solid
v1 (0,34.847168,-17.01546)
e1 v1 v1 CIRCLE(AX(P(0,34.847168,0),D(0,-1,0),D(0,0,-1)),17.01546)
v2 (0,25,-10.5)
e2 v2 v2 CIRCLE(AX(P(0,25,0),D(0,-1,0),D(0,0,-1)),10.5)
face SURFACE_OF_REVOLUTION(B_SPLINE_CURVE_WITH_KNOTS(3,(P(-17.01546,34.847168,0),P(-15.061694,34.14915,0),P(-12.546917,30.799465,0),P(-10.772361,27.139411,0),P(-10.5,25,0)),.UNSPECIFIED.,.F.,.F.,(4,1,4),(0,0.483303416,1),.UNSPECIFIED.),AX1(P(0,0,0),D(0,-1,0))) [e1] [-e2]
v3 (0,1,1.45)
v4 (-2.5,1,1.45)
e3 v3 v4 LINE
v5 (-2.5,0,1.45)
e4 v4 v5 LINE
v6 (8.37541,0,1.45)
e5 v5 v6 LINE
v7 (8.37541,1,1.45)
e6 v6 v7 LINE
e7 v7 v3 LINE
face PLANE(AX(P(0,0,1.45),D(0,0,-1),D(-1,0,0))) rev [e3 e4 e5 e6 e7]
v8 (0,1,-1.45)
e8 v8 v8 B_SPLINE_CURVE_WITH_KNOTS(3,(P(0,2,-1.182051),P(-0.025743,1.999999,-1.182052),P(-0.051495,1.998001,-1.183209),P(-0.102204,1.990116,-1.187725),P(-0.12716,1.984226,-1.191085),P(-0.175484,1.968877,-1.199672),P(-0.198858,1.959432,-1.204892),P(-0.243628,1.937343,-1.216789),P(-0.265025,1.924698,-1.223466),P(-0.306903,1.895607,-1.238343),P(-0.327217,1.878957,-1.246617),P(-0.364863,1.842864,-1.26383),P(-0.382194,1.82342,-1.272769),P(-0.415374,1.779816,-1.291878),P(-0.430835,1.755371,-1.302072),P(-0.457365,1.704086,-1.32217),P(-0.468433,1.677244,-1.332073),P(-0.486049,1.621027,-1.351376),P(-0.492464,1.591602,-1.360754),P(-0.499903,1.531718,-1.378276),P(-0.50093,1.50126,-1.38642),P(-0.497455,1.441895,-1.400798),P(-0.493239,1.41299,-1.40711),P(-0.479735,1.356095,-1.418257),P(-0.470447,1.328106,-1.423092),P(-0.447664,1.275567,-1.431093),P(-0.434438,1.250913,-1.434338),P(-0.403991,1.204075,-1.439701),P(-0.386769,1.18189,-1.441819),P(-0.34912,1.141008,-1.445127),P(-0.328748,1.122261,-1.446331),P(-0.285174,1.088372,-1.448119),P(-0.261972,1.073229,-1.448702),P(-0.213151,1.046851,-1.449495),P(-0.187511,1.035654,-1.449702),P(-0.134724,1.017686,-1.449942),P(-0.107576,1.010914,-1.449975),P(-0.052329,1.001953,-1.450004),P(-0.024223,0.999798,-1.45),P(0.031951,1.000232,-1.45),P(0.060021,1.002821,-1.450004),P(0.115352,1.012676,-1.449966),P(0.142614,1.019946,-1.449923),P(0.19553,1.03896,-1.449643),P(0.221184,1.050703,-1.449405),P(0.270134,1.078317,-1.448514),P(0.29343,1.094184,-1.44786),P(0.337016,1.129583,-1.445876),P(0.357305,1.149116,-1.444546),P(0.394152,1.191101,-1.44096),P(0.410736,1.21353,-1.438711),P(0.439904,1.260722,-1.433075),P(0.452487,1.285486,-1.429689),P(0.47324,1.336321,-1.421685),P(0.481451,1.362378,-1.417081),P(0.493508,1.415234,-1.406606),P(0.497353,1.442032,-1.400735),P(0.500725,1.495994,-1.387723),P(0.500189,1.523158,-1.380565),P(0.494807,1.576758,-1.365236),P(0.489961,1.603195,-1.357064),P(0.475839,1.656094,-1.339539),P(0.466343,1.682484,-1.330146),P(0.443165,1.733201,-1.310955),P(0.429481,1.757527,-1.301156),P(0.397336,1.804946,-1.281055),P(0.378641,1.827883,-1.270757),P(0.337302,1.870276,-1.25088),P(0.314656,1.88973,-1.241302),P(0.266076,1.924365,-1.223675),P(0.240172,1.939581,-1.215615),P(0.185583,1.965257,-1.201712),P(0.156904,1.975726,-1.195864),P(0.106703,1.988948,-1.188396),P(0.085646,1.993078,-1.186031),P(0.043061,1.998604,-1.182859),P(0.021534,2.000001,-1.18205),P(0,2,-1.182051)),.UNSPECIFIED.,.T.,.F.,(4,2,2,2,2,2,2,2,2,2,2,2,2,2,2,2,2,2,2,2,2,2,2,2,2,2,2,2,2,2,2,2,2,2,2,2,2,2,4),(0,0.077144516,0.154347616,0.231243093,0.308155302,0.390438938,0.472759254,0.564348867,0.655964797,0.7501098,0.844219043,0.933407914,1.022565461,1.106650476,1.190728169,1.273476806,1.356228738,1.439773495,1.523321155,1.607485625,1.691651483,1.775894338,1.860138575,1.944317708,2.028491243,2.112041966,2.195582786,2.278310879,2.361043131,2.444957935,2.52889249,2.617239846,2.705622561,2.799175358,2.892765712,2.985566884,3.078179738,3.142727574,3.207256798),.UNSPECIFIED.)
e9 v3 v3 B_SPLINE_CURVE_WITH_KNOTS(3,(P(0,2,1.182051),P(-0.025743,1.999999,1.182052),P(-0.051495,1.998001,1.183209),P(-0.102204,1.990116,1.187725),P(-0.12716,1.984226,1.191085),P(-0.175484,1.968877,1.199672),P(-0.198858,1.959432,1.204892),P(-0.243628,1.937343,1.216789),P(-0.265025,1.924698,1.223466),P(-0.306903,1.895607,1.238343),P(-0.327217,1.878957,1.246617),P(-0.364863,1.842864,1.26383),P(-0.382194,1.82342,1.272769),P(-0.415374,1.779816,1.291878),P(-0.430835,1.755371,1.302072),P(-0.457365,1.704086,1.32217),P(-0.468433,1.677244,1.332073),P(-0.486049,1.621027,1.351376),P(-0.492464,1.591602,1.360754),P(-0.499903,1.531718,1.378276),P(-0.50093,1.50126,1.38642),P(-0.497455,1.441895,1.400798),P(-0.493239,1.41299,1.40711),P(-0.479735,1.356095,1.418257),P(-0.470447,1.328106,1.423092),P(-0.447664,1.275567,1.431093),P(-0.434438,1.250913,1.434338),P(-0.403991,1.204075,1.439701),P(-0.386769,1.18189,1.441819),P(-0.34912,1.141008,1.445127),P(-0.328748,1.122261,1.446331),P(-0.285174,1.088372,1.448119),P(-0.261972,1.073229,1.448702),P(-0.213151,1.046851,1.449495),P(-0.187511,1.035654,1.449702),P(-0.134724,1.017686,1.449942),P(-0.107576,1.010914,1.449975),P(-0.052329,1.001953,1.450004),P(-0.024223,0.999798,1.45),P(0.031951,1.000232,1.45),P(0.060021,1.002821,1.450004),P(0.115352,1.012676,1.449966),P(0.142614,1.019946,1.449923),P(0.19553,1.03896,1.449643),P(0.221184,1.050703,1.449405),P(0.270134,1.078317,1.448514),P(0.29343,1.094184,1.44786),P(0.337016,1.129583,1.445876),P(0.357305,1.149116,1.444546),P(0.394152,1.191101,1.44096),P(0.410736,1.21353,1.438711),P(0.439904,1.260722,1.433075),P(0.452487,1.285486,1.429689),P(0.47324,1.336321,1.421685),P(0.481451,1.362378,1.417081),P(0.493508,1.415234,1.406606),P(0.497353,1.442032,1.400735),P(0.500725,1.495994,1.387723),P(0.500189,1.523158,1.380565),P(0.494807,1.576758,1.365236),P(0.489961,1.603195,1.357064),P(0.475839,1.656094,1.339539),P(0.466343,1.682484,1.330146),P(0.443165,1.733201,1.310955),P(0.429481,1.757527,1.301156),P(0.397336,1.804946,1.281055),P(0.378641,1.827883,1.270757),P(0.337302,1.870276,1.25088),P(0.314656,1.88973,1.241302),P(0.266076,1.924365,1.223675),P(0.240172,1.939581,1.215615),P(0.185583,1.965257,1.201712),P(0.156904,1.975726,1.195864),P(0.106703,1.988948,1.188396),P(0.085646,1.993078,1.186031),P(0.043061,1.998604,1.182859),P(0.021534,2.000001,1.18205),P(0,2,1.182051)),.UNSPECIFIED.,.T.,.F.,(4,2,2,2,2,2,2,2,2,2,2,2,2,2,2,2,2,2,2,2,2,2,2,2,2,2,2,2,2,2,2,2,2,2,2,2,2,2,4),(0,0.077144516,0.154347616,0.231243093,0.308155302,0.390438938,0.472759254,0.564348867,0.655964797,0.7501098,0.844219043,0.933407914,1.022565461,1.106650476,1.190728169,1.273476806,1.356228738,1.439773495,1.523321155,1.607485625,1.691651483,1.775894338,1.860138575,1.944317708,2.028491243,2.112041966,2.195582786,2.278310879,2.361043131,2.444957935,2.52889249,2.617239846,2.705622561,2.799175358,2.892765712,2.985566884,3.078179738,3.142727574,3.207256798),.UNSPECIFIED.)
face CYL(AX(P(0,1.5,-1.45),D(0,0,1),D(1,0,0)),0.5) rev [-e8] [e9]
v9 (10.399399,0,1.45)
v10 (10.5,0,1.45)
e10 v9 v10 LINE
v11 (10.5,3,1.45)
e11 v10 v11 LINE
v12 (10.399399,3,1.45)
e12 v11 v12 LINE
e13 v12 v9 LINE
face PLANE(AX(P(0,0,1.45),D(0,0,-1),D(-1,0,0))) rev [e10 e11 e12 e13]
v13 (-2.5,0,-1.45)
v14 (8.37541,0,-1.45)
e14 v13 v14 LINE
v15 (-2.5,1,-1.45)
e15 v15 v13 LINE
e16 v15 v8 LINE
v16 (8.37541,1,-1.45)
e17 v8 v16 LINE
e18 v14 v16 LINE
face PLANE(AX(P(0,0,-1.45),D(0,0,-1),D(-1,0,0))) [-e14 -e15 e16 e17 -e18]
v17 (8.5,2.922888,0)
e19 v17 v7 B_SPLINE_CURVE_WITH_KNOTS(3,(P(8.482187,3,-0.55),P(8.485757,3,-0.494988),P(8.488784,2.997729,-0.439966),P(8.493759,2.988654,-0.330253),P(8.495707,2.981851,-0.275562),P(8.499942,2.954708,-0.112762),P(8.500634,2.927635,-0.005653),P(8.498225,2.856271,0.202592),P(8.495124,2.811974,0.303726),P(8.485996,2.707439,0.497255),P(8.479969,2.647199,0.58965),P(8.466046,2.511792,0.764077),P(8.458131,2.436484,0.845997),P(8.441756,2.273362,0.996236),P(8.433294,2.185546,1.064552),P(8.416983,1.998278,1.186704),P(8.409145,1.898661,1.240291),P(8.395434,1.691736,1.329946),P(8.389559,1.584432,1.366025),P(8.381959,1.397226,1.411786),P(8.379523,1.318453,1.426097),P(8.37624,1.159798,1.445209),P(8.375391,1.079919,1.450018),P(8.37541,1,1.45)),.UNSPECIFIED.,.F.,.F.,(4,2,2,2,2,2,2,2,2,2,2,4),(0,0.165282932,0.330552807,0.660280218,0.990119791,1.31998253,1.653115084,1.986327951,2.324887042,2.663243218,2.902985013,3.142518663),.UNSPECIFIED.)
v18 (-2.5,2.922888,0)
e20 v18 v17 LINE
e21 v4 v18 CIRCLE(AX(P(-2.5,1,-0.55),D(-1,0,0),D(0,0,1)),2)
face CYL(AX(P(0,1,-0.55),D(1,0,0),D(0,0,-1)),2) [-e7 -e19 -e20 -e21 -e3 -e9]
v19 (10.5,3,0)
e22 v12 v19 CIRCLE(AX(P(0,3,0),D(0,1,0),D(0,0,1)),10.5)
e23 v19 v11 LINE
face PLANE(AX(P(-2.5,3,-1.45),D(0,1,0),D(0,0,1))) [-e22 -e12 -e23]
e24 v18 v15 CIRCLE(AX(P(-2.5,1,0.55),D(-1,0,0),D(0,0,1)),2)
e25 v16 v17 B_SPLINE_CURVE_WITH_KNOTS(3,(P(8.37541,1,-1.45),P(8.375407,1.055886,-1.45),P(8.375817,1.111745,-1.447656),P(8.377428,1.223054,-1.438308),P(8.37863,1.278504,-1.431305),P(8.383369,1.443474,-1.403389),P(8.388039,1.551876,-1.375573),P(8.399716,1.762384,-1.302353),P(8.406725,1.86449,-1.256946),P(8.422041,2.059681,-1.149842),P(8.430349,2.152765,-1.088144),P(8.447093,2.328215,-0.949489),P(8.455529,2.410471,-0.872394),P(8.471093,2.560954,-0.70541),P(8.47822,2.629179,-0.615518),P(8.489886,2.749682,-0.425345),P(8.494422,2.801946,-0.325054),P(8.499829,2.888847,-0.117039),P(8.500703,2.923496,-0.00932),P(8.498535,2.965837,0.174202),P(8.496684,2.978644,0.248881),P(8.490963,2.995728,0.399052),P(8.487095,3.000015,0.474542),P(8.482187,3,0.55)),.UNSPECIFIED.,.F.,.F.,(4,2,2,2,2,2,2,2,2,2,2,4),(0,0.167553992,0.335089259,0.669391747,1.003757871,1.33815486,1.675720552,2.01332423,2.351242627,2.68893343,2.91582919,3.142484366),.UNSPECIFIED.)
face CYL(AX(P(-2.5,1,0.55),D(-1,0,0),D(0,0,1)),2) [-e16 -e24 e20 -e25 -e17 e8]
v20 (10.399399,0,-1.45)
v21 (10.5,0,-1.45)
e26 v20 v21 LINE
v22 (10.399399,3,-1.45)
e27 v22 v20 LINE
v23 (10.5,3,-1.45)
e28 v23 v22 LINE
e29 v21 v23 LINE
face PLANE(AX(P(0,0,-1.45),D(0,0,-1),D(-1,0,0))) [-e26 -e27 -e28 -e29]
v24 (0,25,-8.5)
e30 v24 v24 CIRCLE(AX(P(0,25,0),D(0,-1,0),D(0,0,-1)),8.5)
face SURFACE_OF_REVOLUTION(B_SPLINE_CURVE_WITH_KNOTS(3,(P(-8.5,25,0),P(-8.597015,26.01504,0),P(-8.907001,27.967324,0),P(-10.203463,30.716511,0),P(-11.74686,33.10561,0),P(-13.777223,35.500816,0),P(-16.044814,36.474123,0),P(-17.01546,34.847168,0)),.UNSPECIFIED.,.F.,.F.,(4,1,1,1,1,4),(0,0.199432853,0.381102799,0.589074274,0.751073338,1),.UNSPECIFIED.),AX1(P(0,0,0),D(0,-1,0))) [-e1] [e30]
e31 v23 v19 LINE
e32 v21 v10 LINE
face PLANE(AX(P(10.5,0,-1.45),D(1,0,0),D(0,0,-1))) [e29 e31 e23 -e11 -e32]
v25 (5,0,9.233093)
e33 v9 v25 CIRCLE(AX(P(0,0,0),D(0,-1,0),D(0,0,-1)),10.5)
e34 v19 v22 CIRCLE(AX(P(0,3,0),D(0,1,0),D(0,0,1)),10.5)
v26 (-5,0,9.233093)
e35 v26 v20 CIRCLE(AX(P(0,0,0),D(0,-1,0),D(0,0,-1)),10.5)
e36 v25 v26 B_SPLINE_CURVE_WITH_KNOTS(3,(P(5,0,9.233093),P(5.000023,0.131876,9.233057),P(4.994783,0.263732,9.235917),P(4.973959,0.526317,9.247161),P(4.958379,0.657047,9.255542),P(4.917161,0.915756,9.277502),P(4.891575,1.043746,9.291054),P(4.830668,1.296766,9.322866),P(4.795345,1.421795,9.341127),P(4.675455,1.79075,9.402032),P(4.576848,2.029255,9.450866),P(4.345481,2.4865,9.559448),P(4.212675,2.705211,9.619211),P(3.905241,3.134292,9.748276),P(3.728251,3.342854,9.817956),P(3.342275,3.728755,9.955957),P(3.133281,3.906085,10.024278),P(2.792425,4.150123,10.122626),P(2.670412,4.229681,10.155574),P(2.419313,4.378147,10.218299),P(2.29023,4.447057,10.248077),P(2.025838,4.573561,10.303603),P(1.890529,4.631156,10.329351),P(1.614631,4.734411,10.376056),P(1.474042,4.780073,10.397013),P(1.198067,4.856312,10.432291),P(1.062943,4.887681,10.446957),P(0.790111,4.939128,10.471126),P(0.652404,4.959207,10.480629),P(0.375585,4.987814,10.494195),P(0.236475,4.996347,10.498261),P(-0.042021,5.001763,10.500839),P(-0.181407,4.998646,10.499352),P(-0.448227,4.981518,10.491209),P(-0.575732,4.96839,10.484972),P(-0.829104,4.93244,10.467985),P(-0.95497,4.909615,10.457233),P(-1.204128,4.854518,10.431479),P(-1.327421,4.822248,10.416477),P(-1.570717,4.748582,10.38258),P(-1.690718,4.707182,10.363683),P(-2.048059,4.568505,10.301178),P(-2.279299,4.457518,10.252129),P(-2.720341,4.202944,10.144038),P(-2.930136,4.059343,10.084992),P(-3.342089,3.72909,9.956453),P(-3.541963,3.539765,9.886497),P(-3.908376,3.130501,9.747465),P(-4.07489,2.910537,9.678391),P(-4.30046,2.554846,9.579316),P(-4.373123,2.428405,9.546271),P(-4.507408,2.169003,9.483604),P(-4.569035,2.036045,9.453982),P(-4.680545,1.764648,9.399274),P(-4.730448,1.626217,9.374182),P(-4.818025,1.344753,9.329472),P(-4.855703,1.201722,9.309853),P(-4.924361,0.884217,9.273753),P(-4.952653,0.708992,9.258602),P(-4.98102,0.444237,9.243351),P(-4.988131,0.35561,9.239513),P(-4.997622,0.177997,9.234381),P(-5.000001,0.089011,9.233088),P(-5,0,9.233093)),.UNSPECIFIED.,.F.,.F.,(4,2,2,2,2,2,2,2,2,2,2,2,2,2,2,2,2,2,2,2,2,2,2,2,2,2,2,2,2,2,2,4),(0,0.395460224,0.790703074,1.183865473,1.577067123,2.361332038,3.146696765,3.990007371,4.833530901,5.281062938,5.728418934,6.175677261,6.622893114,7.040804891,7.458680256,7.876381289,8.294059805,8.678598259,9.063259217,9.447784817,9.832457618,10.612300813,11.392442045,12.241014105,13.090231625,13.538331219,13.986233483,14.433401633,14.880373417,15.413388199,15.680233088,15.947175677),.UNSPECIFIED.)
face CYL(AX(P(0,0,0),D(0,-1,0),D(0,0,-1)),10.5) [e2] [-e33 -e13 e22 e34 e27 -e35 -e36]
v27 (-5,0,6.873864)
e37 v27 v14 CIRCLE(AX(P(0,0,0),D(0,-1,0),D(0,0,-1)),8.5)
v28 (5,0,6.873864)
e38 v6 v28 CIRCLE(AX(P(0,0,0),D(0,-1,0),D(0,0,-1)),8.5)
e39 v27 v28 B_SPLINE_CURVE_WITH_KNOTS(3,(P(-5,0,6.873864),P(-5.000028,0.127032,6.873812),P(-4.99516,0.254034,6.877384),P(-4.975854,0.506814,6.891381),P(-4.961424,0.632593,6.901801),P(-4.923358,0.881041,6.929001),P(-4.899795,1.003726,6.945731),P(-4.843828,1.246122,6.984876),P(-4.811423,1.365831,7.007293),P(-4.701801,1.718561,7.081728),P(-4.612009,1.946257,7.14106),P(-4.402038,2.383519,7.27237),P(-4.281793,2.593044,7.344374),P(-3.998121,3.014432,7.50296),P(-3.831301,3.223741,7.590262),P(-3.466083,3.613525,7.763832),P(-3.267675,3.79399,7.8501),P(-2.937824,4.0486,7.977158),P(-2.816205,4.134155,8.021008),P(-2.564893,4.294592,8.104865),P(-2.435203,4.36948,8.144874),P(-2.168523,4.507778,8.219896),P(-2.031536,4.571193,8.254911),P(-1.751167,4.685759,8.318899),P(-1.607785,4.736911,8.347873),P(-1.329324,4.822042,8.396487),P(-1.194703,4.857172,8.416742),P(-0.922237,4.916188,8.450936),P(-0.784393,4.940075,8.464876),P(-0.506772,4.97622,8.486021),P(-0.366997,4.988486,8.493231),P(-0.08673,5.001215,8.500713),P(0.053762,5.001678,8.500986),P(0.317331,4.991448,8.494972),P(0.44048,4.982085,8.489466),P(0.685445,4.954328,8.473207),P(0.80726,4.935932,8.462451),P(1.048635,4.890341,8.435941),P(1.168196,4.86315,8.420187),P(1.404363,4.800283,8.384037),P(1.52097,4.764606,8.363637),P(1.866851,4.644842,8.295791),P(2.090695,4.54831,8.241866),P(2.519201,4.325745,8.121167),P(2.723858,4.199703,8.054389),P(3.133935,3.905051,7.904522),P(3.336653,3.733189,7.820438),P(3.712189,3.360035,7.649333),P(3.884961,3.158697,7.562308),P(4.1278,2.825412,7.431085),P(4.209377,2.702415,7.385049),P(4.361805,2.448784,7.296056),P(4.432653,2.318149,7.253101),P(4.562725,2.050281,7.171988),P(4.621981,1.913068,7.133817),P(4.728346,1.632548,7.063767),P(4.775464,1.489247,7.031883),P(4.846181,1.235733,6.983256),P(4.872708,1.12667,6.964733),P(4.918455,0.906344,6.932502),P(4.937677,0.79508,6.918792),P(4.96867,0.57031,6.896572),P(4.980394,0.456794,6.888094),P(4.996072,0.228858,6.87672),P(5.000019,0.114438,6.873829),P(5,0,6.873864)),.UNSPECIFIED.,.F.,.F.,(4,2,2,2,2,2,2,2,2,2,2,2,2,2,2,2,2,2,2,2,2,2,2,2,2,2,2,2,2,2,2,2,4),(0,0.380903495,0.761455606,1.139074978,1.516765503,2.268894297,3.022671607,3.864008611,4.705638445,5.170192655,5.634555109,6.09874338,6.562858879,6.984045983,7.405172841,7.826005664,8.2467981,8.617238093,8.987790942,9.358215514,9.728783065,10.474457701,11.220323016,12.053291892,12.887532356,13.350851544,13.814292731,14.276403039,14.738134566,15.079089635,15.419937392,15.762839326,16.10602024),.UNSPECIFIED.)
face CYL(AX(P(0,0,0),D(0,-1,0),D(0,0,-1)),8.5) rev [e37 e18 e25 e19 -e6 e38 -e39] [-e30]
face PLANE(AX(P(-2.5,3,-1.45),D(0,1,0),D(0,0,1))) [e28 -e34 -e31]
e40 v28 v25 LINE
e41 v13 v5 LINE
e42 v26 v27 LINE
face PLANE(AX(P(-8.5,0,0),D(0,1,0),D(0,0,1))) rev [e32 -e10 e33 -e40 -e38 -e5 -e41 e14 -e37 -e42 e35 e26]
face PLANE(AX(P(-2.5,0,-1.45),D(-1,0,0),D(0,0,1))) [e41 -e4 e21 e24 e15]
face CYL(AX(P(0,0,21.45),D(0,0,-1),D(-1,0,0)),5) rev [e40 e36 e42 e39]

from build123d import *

# Parameters (mm, degrees)
BOSS_EXTRUDE1_DEPTH      = 1.45
BOSS_EXTRUDE1_DEPTH_BACK = 1.45
SKETCH3_W                = 13
SKETCH3_H                = 3
SKETCH3_R                = 0.5
SKETCH4_R                = 5
CUT_EXTRUDE1_DEPTH       = 20
FILLET1_R                = 2


with BuildPart() as part:
    # Sketch1 → Revolve1 (revolve)
    with BuildSketch(Plane.XY, mode=Mode.PRIVATE) as revolve1_sk:
        with BuildLine():
            Line((-8.5, 0), (-8.5, 25))
            add(Edge.make_bspline(
                [(-8.5, 25), (-8.597015347, 26.01504006), (-8.907000797, 27.967323593), (-10.203463046, 30.716511268), (-11.74686042, 33.10560974), (-13.777222786, 35.500816023), (-16.044814471, 36.474123076), (-17.015460227, 34.847167716)],
                knots=[0, 0, 0, 0, 0.199432853, 0.381102799, 0.589074274, 0.751073338, 1, 1, 1, 1], degree=3))
            add(Edge.make_bspline(
                [(-17.015460227, 34.847167716), (-15.061693604, 34.149149549), (-12.546917313, 30.799465382), (-10.772360994, 27.13941137), (-10.5, 25)],
                knots=[0, 0, 0, 0, 0.483303416, 1, 1, 1, 1], degree=3))
            Line((-10.5, 25), (-10.5, 0))
            Line((-10.5, 0), (-8.5, 0))
        make_face()
    revolve(revolve1_sk.sketch.rotate(Axis((0, 0, 0), (0, 1, 0)), 270), axis=Axis((0, 0, 0), (0, 1, 0)))

    # Sketch3 → Boss-Extrude1 (add, two sides: drawn at the far end of the back side and taken through both)
    with BuildSketch(Plane.XY.offset(-BOSS_EXTRUDE1_DEPTH_BACK)):
        with Locations((4, 1.5)):
            Rectangle(SKETCH3_W, SKETCH3_H)
        with Locations((0, 1.5)):
            Circle(SKETCH3_R, mode=Mode.SUBTRACT)
    extrude(amount=BOSS_EXTRUDE1_DEPTH + BOSS_EXTRUDE1_DEPTH_BACK)

    # Sketch4 → Cut-Extrude1 (cut)
    with BuildSketch(Plane.XY.offset(1.45)):
        Circle(SKETCH4_R)
    extrude(amount=CUT_EXTRUDE1_DEPTH, mode=Mode.SUBTRACT)

    # Fillet1
    # the kernel refuses this fillet: 2 mm, written as the material it takes off along each edge
    with BuildSketch(Plane(origin=(13.375410438, 3, -1.45), x_dir=(0, 0, 1), z_dir=(-1, 0, 0))) as fillet1_piece_1_section:
        with BuildLine():
            CenterArc((FILLET1_R, -FILLET1_R), FILLET1_R, 90, 90)
            Line((0, -FILLET1_R), (0, 0))
            Line((0, 0), (FILLET1_R, 0))
        make_face()
    fillet1_piece_1 = extrude(amount=20.875410438, mode=Mode.PRIVATE)
    fillet1_piece_1 = fillet1_piece_1 & Plane(origin=(0, 2.559869682, 0), x_dir=(0, 0, -1), z_dir=(0, 1, 0)) * Cylinder(8.5, 50, mode=Mode.PRIVATE)
    add(fillet1_piece_1, mode=Mode.SUBTRACT)
    with BuildSketch(Plane(origin=(-7.5, 3, 1.45), x_dir=(0, -1, 0), z_dir=(1, 0, 0))) as fillet1_piece_2_section:
        with BuildLine():
            CenterArc((FILLET1_R, FILLET1_R), FILLET1_R, 180, 90)
            Line((0, FILLET1_R), (0, 0))
            Line((0, 0), (FILLET1_R, 0))
        make_face()
    fillet1_piece_2 = extrude(amount=20.875410438, mode=Mode.PRIVATE)
    fillet1_piece_2 = fillet1_piece_2 & Plane(origin=(0, 2.559861322, 0), x_dir=(0, 0, -1), z_dir=(0, 1, 0)) * Cylinder(8.5, 50, mode=Mode.PRIVATE)
    add(fillet1_piece_2, mode=Mode.SUBTRACT)


solid = part.part
